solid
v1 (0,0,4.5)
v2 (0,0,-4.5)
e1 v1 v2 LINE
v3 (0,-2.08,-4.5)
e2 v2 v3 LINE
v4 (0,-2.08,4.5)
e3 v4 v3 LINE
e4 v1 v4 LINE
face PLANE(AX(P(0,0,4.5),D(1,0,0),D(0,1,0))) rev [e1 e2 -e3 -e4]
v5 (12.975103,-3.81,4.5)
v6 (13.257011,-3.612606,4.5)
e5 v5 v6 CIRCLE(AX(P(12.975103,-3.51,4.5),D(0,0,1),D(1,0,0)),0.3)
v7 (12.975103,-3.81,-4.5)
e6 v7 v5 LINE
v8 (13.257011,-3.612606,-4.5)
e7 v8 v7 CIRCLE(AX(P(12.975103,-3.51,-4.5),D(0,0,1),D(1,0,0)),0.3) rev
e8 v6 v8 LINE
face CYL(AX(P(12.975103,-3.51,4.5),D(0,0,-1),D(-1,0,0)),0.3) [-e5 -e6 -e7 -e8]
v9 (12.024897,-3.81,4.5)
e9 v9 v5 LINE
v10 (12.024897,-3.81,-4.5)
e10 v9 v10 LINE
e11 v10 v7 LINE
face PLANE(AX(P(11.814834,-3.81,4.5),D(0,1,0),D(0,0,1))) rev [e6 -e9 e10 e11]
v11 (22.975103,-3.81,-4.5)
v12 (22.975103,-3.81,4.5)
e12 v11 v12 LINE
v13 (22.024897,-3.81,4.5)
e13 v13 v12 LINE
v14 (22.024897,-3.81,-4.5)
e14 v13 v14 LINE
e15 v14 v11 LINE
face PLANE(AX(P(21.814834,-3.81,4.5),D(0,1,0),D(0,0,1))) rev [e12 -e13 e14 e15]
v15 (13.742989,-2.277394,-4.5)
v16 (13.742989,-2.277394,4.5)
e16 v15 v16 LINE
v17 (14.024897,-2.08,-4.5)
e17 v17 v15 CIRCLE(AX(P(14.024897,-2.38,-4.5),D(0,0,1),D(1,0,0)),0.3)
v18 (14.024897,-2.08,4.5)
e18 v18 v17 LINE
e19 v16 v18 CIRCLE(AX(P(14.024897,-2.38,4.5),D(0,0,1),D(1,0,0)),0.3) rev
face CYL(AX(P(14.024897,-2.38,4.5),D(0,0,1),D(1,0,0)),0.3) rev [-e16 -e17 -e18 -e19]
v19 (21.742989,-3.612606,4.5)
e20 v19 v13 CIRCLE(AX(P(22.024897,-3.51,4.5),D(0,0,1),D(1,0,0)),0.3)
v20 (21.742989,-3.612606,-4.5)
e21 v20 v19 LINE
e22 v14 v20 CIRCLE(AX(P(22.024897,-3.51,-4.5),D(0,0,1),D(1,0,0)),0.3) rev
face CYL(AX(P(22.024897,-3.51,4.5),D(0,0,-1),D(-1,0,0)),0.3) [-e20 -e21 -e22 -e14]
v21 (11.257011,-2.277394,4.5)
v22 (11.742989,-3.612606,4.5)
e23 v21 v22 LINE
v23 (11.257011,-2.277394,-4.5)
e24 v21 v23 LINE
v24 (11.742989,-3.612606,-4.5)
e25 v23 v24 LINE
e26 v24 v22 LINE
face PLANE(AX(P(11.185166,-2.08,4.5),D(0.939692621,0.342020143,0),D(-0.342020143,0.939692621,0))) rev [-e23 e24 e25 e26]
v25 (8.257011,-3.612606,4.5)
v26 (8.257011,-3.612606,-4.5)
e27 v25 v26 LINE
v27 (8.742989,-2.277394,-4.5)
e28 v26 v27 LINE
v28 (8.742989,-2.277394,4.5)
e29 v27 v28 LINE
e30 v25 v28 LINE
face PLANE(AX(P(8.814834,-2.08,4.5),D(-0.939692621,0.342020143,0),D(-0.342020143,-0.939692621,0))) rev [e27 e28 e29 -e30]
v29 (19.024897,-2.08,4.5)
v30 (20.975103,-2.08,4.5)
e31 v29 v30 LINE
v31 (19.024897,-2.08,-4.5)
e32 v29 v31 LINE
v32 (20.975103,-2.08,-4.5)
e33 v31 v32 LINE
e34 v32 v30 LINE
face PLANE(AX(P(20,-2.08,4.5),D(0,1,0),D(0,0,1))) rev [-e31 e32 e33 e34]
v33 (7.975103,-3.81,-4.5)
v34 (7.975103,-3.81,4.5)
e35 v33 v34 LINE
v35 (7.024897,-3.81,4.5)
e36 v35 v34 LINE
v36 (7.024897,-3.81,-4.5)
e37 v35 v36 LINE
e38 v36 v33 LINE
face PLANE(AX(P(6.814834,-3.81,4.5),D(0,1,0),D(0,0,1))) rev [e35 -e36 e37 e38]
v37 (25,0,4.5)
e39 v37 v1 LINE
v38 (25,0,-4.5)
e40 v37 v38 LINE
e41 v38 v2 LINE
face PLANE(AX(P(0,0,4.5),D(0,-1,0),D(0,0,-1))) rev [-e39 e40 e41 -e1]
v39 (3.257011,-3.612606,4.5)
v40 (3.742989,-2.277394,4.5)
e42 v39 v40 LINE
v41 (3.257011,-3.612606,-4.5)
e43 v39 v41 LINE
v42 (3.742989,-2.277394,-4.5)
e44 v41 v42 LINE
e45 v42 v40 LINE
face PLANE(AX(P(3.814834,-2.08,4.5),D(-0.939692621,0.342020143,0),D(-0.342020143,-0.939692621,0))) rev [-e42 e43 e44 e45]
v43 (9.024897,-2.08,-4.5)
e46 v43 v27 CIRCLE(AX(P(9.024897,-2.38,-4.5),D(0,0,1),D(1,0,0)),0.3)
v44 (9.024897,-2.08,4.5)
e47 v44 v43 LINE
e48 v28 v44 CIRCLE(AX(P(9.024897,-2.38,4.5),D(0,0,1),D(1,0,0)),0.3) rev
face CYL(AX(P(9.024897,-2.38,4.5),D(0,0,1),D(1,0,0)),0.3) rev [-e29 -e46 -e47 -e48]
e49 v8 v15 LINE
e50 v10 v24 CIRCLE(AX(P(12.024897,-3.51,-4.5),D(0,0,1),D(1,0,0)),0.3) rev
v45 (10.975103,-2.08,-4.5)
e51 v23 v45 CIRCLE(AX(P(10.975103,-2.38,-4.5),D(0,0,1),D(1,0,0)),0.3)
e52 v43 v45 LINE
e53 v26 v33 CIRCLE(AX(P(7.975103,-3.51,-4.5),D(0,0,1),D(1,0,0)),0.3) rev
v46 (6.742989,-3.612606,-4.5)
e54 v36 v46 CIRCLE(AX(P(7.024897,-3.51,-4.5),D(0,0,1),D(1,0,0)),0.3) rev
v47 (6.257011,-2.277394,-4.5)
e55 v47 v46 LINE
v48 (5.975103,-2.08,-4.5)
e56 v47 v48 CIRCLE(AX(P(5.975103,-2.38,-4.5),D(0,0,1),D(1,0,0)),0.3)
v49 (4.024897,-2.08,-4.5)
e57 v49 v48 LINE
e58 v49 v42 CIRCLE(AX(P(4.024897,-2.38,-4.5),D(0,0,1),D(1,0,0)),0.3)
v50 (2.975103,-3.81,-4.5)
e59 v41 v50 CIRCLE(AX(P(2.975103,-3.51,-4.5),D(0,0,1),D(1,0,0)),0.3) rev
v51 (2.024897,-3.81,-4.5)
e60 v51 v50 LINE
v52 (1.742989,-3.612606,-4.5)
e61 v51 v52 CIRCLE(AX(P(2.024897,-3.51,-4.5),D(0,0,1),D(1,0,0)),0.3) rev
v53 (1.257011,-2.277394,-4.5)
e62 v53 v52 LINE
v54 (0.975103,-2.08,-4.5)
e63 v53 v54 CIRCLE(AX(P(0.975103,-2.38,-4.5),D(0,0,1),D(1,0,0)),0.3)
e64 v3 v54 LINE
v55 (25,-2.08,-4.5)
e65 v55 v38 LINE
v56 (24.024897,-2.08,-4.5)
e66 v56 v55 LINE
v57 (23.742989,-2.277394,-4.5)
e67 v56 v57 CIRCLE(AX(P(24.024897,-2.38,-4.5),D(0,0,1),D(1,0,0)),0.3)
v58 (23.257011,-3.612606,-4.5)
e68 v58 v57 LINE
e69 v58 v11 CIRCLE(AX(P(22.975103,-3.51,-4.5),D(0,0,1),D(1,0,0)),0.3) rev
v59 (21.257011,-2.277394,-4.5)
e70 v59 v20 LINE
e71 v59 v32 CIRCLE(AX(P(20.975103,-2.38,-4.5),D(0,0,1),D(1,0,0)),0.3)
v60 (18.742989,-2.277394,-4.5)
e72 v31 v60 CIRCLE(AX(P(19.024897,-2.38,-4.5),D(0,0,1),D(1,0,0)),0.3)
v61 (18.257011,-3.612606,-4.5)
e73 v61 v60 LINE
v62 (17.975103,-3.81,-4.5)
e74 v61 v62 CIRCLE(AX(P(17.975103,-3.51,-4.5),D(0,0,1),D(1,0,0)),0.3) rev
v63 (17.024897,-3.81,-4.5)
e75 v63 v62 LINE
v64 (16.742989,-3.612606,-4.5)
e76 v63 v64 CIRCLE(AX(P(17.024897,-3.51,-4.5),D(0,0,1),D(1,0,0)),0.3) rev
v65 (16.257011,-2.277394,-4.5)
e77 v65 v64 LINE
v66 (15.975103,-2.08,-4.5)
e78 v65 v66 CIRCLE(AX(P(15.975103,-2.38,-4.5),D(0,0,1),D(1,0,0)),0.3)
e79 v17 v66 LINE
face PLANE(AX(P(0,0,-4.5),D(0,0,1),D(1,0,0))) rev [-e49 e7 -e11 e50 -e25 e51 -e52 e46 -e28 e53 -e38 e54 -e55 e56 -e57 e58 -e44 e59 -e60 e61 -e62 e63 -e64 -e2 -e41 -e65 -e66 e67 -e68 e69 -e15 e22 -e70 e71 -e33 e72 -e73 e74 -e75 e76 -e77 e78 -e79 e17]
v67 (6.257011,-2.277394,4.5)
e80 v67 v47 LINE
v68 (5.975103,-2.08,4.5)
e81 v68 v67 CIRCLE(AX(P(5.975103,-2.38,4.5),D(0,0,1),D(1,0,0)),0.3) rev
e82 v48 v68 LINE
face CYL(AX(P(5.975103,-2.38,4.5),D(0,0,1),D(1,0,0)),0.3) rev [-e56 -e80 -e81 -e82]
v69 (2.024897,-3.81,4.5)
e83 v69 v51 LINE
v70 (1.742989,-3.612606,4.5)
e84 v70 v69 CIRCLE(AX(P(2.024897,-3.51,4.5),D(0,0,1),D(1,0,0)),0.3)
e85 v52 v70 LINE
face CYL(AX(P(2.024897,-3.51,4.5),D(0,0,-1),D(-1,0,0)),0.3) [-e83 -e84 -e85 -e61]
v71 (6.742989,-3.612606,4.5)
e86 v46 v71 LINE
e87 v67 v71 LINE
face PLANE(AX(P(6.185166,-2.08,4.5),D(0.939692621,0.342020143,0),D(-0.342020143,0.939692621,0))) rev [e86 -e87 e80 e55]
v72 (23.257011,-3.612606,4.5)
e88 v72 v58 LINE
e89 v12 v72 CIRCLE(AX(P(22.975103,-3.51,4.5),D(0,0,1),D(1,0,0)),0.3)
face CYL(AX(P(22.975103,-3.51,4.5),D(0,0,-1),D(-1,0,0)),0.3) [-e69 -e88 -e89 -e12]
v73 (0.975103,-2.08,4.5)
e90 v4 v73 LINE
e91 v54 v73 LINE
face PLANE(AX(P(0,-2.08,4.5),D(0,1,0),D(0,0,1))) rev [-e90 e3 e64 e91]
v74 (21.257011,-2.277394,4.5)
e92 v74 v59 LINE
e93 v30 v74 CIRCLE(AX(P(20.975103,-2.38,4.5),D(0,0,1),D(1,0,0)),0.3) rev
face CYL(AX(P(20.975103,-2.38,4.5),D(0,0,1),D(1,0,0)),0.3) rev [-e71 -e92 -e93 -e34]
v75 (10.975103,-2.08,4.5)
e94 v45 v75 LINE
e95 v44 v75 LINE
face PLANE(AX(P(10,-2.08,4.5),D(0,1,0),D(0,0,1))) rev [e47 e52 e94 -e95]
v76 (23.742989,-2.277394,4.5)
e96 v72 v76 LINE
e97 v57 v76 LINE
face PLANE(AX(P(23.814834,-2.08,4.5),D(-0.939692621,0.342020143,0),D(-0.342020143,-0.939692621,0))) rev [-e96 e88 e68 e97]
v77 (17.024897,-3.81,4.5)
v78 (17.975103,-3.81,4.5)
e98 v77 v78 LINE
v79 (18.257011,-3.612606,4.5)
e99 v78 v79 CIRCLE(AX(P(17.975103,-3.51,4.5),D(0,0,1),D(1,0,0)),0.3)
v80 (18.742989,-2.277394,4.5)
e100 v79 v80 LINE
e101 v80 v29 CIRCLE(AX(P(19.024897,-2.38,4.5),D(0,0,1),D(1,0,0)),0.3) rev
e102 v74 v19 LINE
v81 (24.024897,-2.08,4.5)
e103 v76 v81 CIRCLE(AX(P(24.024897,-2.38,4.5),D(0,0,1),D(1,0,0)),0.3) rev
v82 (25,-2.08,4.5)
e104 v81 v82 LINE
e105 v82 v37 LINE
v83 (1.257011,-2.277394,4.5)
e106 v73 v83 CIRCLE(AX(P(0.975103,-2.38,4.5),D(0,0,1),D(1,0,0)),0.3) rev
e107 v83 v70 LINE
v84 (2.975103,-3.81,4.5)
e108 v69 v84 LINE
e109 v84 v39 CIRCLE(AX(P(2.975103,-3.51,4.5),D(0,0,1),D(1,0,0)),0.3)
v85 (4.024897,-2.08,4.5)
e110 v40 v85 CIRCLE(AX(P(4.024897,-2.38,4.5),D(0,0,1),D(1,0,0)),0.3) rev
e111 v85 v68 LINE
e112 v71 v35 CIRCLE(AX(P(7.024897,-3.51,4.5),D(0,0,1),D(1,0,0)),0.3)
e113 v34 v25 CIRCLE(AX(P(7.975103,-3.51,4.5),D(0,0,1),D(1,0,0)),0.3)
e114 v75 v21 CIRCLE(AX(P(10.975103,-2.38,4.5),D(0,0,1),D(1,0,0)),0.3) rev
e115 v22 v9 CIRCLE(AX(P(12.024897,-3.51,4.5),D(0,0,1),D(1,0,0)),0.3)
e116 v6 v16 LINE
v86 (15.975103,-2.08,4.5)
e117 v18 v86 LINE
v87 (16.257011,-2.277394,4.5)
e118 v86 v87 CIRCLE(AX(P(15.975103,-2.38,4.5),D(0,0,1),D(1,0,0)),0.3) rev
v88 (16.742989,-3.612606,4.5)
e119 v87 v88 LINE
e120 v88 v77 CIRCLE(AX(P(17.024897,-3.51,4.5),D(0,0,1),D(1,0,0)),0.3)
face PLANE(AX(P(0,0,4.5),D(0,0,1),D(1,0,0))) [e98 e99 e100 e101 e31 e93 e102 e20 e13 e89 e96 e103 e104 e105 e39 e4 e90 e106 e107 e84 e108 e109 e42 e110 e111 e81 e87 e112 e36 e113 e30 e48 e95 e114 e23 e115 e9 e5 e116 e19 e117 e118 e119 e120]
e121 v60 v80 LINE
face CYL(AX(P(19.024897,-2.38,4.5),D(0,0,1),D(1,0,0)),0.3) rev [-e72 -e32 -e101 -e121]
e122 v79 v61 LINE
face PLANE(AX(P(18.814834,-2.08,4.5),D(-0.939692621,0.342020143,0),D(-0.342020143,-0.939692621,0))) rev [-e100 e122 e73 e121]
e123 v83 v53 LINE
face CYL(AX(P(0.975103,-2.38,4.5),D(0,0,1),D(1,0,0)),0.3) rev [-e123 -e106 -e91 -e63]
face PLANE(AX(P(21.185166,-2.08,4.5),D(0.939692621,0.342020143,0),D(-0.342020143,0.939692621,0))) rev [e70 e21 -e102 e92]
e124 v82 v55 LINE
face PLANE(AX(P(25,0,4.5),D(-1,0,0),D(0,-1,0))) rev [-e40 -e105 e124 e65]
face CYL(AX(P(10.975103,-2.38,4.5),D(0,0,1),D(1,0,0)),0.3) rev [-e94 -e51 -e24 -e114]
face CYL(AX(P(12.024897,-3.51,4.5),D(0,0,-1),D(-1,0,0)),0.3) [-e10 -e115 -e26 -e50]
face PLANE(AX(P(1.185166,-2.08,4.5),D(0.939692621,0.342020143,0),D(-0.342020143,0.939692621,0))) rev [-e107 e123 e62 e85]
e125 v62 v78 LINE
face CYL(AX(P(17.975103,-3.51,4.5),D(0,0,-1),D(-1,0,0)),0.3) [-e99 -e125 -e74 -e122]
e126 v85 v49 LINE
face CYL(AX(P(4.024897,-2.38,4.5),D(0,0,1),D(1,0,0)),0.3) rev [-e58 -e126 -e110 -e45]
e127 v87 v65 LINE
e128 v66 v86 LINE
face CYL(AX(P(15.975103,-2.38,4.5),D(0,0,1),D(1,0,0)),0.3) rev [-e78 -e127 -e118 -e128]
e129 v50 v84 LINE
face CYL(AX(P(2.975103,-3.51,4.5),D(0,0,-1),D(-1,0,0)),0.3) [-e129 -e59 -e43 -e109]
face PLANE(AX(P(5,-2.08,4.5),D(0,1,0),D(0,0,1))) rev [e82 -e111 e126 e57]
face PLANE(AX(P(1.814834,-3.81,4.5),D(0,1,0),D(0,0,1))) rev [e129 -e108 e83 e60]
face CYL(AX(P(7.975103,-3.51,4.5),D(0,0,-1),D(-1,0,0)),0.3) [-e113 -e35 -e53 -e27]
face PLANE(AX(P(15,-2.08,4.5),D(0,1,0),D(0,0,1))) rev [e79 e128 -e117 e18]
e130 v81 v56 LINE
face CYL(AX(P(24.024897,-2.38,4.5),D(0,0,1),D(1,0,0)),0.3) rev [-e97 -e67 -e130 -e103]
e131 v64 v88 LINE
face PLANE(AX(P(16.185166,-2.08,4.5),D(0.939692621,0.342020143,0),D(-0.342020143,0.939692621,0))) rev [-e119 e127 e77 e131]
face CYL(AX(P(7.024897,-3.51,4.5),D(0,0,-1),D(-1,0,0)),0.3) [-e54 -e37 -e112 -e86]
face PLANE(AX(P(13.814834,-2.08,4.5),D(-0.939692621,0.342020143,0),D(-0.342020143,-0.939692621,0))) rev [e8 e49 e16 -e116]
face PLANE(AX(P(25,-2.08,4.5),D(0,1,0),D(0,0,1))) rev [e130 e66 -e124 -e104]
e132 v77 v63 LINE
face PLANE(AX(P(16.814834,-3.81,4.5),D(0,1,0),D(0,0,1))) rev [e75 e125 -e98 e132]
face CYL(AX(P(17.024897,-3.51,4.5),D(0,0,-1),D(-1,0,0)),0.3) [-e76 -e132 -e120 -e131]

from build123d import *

# Parameters (mm, degrees)
BOSS_EXTRUDE1_DEPTH    = 4.5
FILLET1_R              = 0.3
LPATTERN1_COUNT        = 5
LPATTERN1_PITCH        = 5
FILLET1_OF_LPATTERN1_R = 0.3


with BuildPart() as part:
    # Sketch1 → Boss-Extrude1 (new, symmetric)
    with BuildSketch(Plane.XY):
        Polygon((0, 0), (5, 0), (5, -2.08), (3.814834253, -2.08), (3.185165747, -3.81), (1.814834253, -3.81), (1.185165747, -2.08), (0, -2.08), align=None)
    boss_extrude1 = extrude(amount=BOSS_EXTRUDE1_DEPTH, both=True)

    # Fillet1
    fillet1_edges = [part.edges().sort_by_distance(p)[0] for p in [
        (1.814834253, -3.81, 0),
        (1.185165747, -2.08, 0),
        (3.185165747, -3.81, 0),
        (3.814834253, -2.08, 0),
    ]]
    fillet(fillet1_edges, radius=FILLET1_R)

    # LPattern1: Boss-Extrude1 ×5
    with Locations(*[(i * LPATTERN1_PITCH, 0, 0) for i in range(1, LPATTERN1_COUNT)]):
        add(boss_extrude1)

    # Fillet1 of LPattern1
    fillet1_of_lpattern1_edges = [part.edges().sort_by_distance(p)[0] for p in [
        (6.814834253, -3.81, 0),
        (6.185165747, -2.08, 0),
        (8.185165747, -3.81, 0),
        (8.814834253, -2.08, 0),
        (11.814834253, -3.81, 0),
        (11.185165747, -2.08, 0),
        (13.185165747, -3.81, 0),
        (13.814834253, -2.08, 0),
        (16.814834253, -3.81, 0),
        (16.185165747, -2.08, 0),
        (18.185165747, -3.81, 0),
        (18.814834253, -2.08, 0),
        (21.814834253, -3.81, 0),
        (21.185165747, -2.08, 0),
        (23.185165747, -3.81, 0),
        (23.814834253, -2.08, 0),
    ]]
    fillet(fillet1_of_lpattern1_edges, radius=FILLET1_OF_LPATTERN1_R)


solid = part.part
